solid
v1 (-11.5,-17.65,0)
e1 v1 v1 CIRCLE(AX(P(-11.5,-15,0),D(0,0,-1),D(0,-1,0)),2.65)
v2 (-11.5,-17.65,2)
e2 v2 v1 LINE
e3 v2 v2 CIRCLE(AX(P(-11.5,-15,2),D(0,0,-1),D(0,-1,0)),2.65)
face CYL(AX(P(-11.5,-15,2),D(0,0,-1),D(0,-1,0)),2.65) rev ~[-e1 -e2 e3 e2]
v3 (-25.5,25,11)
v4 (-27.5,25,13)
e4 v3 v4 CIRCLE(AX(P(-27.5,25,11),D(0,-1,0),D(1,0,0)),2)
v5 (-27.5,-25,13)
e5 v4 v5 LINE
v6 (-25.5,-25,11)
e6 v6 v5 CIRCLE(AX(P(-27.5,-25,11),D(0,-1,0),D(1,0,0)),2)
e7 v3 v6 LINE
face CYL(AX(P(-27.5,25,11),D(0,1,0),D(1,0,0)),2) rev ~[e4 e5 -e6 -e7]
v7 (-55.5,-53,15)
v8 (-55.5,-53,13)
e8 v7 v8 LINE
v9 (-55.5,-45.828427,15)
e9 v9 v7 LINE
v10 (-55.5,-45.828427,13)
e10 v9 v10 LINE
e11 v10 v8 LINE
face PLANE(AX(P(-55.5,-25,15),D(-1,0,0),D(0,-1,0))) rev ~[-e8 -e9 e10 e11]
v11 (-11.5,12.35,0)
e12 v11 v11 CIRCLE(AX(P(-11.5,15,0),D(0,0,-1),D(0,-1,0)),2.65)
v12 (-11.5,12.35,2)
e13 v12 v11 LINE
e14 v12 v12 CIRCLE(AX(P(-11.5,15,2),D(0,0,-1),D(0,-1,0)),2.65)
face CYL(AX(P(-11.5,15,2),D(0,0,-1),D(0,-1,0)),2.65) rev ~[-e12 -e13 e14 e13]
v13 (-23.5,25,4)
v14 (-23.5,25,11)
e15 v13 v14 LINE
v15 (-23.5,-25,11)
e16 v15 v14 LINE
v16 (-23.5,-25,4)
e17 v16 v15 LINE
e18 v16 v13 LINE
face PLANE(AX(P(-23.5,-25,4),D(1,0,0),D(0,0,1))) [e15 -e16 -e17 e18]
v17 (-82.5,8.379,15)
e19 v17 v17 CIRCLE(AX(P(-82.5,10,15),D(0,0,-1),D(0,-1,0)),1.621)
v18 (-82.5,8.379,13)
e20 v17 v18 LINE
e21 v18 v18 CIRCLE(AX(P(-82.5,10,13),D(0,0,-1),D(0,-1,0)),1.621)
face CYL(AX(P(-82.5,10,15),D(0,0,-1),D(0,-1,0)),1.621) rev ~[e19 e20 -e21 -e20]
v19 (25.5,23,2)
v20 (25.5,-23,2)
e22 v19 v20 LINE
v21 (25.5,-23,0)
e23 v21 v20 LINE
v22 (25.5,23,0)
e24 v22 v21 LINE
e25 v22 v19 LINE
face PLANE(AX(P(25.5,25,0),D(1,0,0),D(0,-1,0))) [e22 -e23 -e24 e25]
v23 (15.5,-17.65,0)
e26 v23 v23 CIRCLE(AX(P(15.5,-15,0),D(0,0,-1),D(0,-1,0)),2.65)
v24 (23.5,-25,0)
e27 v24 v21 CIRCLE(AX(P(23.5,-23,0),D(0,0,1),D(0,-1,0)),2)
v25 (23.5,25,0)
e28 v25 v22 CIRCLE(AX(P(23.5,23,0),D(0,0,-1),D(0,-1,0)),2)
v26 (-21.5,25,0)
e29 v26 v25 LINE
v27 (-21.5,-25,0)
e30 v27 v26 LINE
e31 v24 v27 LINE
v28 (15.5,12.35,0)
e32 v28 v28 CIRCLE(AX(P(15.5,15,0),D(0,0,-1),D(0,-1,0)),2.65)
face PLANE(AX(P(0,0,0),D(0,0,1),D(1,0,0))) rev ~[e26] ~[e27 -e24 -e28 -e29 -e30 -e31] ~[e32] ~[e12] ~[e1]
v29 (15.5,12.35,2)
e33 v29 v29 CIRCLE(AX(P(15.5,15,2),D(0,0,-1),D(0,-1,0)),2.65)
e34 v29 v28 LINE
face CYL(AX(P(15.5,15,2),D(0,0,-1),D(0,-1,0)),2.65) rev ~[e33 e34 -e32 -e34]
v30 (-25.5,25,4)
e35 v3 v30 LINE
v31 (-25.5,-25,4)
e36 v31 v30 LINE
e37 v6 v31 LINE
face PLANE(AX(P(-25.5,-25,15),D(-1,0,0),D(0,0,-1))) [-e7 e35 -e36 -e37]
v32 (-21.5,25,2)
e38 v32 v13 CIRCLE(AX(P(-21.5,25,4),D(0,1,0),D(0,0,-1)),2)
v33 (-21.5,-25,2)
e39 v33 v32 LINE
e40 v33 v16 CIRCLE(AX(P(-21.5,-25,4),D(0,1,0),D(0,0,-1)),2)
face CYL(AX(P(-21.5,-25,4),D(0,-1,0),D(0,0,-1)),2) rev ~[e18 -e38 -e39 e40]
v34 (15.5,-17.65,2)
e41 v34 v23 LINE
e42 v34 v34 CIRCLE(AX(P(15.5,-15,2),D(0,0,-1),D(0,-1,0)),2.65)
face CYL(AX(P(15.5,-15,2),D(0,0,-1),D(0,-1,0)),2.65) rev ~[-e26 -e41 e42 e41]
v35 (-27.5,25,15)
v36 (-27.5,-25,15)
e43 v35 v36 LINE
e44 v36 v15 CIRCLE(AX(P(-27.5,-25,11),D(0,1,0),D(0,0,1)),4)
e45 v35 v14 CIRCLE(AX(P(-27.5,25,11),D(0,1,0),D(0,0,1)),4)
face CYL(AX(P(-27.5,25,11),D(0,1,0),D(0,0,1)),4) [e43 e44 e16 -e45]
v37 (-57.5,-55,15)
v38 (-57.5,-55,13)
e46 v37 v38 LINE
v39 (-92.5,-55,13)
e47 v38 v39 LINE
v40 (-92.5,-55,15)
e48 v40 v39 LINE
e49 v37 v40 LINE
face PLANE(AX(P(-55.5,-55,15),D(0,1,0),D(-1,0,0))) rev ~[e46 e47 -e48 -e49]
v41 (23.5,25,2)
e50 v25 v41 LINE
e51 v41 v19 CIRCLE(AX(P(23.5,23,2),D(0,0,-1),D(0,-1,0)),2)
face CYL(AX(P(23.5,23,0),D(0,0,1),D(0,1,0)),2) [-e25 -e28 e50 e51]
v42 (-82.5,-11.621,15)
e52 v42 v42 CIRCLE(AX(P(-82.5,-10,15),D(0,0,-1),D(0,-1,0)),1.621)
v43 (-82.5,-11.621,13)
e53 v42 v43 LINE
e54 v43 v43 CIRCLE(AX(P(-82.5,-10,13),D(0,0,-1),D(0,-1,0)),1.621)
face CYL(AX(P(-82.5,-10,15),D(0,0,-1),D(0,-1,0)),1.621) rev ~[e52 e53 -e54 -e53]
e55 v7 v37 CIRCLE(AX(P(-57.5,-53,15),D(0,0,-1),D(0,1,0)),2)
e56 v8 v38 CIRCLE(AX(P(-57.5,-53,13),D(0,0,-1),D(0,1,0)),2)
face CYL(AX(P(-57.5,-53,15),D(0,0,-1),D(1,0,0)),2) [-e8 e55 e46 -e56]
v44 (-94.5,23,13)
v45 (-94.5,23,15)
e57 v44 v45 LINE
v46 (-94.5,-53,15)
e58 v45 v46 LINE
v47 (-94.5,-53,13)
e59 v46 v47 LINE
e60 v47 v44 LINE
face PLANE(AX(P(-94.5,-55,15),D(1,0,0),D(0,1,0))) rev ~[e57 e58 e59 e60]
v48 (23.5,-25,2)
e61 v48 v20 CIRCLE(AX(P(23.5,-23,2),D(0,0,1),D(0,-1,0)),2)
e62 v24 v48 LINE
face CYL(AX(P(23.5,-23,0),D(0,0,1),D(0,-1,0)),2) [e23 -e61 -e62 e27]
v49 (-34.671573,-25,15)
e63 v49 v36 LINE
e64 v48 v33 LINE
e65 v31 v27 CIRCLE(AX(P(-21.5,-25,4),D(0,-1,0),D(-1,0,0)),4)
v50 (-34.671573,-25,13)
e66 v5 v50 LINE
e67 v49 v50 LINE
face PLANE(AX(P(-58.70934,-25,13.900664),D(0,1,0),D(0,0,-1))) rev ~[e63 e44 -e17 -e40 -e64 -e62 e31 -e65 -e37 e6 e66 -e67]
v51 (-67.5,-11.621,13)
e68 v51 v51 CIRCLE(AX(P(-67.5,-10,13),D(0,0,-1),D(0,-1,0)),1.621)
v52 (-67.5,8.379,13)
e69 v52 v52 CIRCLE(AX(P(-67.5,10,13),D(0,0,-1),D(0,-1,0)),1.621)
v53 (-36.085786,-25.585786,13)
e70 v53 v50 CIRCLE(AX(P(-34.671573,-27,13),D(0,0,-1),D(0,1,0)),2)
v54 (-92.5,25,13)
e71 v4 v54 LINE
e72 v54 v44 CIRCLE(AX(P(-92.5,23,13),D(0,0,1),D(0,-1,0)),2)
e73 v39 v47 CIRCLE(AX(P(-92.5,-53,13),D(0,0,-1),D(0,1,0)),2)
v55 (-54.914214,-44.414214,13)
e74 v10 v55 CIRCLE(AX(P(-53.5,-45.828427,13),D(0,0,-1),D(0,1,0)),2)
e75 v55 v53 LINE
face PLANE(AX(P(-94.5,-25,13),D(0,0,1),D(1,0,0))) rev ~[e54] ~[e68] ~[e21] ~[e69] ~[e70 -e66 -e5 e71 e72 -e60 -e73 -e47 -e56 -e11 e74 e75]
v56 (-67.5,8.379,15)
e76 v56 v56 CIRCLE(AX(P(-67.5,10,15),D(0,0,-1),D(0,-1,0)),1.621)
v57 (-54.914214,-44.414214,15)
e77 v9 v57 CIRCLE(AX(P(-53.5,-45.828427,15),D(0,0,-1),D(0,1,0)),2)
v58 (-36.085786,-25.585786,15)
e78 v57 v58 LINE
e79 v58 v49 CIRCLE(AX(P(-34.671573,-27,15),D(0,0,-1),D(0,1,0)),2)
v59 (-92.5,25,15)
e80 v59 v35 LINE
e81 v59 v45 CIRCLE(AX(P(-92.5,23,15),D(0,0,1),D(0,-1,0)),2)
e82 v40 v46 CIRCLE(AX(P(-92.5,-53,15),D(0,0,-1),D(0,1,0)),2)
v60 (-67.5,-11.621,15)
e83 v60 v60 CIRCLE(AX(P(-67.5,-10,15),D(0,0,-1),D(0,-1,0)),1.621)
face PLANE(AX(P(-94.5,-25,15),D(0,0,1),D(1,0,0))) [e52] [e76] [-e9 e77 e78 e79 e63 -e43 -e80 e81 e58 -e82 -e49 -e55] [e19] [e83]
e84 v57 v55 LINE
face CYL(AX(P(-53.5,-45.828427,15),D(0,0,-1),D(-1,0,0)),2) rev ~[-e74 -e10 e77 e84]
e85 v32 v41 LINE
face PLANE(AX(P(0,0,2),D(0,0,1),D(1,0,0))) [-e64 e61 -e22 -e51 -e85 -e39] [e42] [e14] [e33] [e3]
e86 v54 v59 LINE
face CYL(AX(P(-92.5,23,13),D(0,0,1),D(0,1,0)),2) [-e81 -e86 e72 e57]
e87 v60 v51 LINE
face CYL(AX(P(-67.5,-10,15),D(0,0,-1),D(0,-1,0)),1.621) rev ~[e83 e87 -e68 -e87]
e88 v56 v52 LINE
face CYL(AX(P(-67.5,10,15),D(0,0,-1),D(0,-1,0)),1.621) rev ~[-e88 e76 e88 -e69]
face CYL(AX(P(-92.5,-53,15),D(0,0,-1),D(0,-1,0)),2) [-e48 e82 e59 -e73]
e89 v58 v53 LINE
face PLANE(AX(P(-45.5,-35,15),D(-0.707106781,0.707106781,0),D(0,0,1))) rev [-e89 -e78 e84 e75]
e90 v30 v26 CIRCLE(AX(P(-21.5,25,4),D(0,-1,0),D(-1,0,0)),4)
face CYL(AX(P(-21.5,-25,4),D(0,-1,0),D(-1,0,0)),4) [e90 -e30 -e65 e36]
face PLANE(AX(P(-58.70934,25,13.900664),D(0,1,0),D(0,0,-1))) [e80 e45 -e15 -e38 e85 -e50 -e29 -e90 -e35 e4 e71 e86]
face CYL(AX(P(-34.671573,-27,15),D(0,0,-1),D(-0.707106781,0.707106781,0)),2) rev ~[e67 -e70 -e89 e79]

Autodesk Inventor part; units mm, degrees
ref_plane "YZ Plane" through (0, 0, 0) normal (1, 0, 0) x (0, 1, 0)
ref_plane "XZ Plane" through (0, 0, 0) normal (0, 1, 0) x (-1, 0, 0)
ref_plane "XY Plane" through (0, 0, 0) normal (0, 0, 1) x (1, 0, 0)
sketch "スケッチ1" plane through (0, 0, 0) normal (0, 0, 1) x (1, 0, 0)
  line L0 (25.5, -25) -> (-25.5, -25)
  line L1 (-25.5, -25) -> (-25.5, 25)
  line L2 (-25.5, 25) -> (25.5, 25)
  line L3 (25.5, 25) -> (25.5, -25)
  line L4 (25.5, -25) -> (-25.5, 25) construction
  line L5 (-25.5, -25) -> (25.5, 25) construction
  point P0 (0, 0)
  dimension "d0" = 51
  dimension "d1" = 50
extrude "プレート1" add sketch "スケッチ1" along normal blind 2
sketch "スケッチ2" plane through (-23.5, -25, 0) normal (-1, 0, 0) x (0, -1, 0)
  line L0 (-50, 0) -> (0, 0)
  line L1 (0, 0) -> (0, 15)
  line L2 (0, 15) -> (-50, 15)
  line L3 (-50, 15) -> (-50, 0)
edge flange "フランジ1" height 15 angle 90 thickness 2 bend radius 2 thickness toward (-1, 0, 0) relief tear relief width 2 relief depth 1 edges at (-25.5, 0, 2) wall of the first edge with corners at (-23.5, 25, 0) (-23.5, -25, 0) (-23.5, -25, 15) (-23.5, 25, 15)
bend "曲げ1"
corner "コーナー1"
sketch "スケッチ3" plane through (-23.5, 25, 13) normal (0, 0, 1) x (1, 0, 0)
  line L0 (0, -50) -> (0, 0)
  line L1 (0, 0) -> (-71, 0)
  line L2 (-71, 0) -> (-71, -50)
  line L3 (-71, -50) -> (0, -50)
edge flange "フランジ2" height 71 angle 90 thickness 2 bend radius 2 thickness toward (0, 0, 1) relief tear relief width 2 relief depth 1 edges at (-25.5, 0, 15) wall of the first edge with corners at (-23.5, -25, 13) (-23.5, 25, 13) (-94.5, 25, 13) (-94.5, -25, 13)
bend "曲げ2"
corner "コーナー2"
sketch "スケッチ4" plane through (0, 0, 2) normal (0, 0, 1) x (1, 0, 0)
  line L0 (-11.5, -15) -> (15.5, -15)
  line L1 (15.5, -15) -> (15.5, 15)
  line L2 (15.5, 15) -> (-11.5, 15)
  line L3 (-11.5, 15) -> (-11.5, -15)
  line L4 (-11.5, -15) -> (15.5, 15) construction
  line L5 (15.5, -15) -> (-11.5, 15) construction
  line L6 (-21.5, 25) -> (25.5, 25) projected
  line L7 (25.5, 25) -> (25.5, -25) projected
  point P0 (0, 0)
  point P1 (2, 0)
  dimension "d23" = 27
  dimension "d25" = 30
  dimension "d26" = 10
  dimension "d27" = 10
hole "穴1" at (-11.5, 15, 2) at (-11.5, -15, 2) at (15.5, -15, 2) at (15.5, 15, 2) direction (0, 0, -1) diameter 5.3 depth 2 tip angle 118
fillet "フィレット1" radius 2 3 edges at (25.5, 25, 1) (25.5, -25, 1) (-94.5, 25, 14)
sketch "スケッチ5" plane through (-27.5, -25, 15) normal (0, 0, 1) x (1, 0, 0)
  line L0 (0, 0) -> (-67, 0) projected
  line L1 (0, 0) -> (0, 50) projected
  line L2 (-65, 50) -> (0, 50) projected
  arc A0 (-65, 50) -> (-67, 48) centre (-65, 48) ccw projected
  line L3 (-67, 0) -> (-67, 48) projected
  line L4 (-55, 15) -> (-40, 15)
  line L5 (-40, 15) -> (-40, 35)
  line L6 (-40, 35) -> (-55, 35)
  line L7 (-55, 35) -> (-55, 15)
  line L8 (-55, 15) -> (-40, 35) construction
  line L9 (-40, 15) -> (-55, 35) construction
  point P0 (27.5, 25)
  point P1 (-47.5, 25)
  dimension "d36" = 15
  dimension "d37" = 19.5
  dimension "d38" = 20
  dimension "d39" = 15
hole "穴2" at (-82.5, 10, 15) at (-82.5, -10, 15) at (-67.5, -10, 15) at (-67.5, 10, 15) direction (0, 0, -1) diameter 3.242 depth 11.8 tip angle 118 thread size "M4x0.7" class "6H" standard "ISO Metric profile"
sketch "スケッチ6" plane through (-94.5, -25, 15) normal (0, 0, 1) x (1, 0, 0)
  circle A0 centre (27, 15) radius 1.621 projected
  circle A1 centre (12, 35) radius 1.621 projected
  circle A2 centre (12, 15) radius 1.621 projected
  circle A3 centre (27, 35) radius 1.621 projected
  arc A4 (2, 50) -> (0, 48) centre (2, 48) ccw projected
  line L0 (0, 0) -> (0, 48) projected
  line L1 (67, 0) -> (0, 0) projected
  line L2 (67, 0) -> (67, 50) projected
  line L3 (2, 50) -> (67, 50) projected
  line L4 (0, 0) -> (39, 0)
  line L5 (39, 0) -> (39, -30)
  line L6 (39, -30) -> (0, -30)
  line L7 (0, -30) -> (0, 0)
  point P0 (94.5, 25)
  point P1 (39, 0)
  dimension "d47" = 39
  dimension "d48" = 80
extrude "押し出し1" add sketch "スケッチ6" against normal up to surface (2 mm away) contours L1 L5 L6 L7
chamfer "面取り1" distance 20 angle 45 1 edges at (-55.5, -25, 14)
fillet "フィレット2" radius 2 4 edges at (-94.5, -55, 14) (-55.5, -55, 14) (-55.5, -45, 14) (-35.5, -25, 14)
equation "\"d33\" = Thickness"
equation "\"d2\" = Thickness"
equation "\"d3\" = BendReliefWidth"
equation "\"d4\" = BendReliefDepth"
equation "\"d5\" = MinimumRemnant"
equation "\"d6\" = TransitionRadius"
equation "\"d9\" = BendRadius"
equation "\"d10\" = CornerReliefSize"
equation "\"d11\" = GapSize"
equation "\"d12\" = JacobiRadiusSize"
equation "\"d13\" = BendReliefWidth"
equation "\"d14\" = BendReliefDepth"
equation "\"d15\" = MinimumRemnant"
equation "\"d16\" = TransitionRadius"
equation "\"d19\" = BendRadius"
equation "\"d20\" = CornerReliefSize"
equation "\"d21\" = GapSize"
equation "\"d22\" = JacobiRadiusSize"
equation "\"BendRadius\" = Thickness"
equation "\"BendReliefWidth\" = Thickness"
equation "\"BendReliefDepth\" = 0.5 * Thickness"
equation "\"CornerReliefSize\" = 4 * Thickness"
equation "\"MinimumRemnant\" = 2 * Thickness"
equation "\"TransitionRadius\" = BendRadius"
equation "\"JacobiRadiusSize\" = BendRadius"
equation "\"GapSize\" = Thickness"
equation "\"Thickness\" = 2"
properties part number "DragChain_Guide_B"
